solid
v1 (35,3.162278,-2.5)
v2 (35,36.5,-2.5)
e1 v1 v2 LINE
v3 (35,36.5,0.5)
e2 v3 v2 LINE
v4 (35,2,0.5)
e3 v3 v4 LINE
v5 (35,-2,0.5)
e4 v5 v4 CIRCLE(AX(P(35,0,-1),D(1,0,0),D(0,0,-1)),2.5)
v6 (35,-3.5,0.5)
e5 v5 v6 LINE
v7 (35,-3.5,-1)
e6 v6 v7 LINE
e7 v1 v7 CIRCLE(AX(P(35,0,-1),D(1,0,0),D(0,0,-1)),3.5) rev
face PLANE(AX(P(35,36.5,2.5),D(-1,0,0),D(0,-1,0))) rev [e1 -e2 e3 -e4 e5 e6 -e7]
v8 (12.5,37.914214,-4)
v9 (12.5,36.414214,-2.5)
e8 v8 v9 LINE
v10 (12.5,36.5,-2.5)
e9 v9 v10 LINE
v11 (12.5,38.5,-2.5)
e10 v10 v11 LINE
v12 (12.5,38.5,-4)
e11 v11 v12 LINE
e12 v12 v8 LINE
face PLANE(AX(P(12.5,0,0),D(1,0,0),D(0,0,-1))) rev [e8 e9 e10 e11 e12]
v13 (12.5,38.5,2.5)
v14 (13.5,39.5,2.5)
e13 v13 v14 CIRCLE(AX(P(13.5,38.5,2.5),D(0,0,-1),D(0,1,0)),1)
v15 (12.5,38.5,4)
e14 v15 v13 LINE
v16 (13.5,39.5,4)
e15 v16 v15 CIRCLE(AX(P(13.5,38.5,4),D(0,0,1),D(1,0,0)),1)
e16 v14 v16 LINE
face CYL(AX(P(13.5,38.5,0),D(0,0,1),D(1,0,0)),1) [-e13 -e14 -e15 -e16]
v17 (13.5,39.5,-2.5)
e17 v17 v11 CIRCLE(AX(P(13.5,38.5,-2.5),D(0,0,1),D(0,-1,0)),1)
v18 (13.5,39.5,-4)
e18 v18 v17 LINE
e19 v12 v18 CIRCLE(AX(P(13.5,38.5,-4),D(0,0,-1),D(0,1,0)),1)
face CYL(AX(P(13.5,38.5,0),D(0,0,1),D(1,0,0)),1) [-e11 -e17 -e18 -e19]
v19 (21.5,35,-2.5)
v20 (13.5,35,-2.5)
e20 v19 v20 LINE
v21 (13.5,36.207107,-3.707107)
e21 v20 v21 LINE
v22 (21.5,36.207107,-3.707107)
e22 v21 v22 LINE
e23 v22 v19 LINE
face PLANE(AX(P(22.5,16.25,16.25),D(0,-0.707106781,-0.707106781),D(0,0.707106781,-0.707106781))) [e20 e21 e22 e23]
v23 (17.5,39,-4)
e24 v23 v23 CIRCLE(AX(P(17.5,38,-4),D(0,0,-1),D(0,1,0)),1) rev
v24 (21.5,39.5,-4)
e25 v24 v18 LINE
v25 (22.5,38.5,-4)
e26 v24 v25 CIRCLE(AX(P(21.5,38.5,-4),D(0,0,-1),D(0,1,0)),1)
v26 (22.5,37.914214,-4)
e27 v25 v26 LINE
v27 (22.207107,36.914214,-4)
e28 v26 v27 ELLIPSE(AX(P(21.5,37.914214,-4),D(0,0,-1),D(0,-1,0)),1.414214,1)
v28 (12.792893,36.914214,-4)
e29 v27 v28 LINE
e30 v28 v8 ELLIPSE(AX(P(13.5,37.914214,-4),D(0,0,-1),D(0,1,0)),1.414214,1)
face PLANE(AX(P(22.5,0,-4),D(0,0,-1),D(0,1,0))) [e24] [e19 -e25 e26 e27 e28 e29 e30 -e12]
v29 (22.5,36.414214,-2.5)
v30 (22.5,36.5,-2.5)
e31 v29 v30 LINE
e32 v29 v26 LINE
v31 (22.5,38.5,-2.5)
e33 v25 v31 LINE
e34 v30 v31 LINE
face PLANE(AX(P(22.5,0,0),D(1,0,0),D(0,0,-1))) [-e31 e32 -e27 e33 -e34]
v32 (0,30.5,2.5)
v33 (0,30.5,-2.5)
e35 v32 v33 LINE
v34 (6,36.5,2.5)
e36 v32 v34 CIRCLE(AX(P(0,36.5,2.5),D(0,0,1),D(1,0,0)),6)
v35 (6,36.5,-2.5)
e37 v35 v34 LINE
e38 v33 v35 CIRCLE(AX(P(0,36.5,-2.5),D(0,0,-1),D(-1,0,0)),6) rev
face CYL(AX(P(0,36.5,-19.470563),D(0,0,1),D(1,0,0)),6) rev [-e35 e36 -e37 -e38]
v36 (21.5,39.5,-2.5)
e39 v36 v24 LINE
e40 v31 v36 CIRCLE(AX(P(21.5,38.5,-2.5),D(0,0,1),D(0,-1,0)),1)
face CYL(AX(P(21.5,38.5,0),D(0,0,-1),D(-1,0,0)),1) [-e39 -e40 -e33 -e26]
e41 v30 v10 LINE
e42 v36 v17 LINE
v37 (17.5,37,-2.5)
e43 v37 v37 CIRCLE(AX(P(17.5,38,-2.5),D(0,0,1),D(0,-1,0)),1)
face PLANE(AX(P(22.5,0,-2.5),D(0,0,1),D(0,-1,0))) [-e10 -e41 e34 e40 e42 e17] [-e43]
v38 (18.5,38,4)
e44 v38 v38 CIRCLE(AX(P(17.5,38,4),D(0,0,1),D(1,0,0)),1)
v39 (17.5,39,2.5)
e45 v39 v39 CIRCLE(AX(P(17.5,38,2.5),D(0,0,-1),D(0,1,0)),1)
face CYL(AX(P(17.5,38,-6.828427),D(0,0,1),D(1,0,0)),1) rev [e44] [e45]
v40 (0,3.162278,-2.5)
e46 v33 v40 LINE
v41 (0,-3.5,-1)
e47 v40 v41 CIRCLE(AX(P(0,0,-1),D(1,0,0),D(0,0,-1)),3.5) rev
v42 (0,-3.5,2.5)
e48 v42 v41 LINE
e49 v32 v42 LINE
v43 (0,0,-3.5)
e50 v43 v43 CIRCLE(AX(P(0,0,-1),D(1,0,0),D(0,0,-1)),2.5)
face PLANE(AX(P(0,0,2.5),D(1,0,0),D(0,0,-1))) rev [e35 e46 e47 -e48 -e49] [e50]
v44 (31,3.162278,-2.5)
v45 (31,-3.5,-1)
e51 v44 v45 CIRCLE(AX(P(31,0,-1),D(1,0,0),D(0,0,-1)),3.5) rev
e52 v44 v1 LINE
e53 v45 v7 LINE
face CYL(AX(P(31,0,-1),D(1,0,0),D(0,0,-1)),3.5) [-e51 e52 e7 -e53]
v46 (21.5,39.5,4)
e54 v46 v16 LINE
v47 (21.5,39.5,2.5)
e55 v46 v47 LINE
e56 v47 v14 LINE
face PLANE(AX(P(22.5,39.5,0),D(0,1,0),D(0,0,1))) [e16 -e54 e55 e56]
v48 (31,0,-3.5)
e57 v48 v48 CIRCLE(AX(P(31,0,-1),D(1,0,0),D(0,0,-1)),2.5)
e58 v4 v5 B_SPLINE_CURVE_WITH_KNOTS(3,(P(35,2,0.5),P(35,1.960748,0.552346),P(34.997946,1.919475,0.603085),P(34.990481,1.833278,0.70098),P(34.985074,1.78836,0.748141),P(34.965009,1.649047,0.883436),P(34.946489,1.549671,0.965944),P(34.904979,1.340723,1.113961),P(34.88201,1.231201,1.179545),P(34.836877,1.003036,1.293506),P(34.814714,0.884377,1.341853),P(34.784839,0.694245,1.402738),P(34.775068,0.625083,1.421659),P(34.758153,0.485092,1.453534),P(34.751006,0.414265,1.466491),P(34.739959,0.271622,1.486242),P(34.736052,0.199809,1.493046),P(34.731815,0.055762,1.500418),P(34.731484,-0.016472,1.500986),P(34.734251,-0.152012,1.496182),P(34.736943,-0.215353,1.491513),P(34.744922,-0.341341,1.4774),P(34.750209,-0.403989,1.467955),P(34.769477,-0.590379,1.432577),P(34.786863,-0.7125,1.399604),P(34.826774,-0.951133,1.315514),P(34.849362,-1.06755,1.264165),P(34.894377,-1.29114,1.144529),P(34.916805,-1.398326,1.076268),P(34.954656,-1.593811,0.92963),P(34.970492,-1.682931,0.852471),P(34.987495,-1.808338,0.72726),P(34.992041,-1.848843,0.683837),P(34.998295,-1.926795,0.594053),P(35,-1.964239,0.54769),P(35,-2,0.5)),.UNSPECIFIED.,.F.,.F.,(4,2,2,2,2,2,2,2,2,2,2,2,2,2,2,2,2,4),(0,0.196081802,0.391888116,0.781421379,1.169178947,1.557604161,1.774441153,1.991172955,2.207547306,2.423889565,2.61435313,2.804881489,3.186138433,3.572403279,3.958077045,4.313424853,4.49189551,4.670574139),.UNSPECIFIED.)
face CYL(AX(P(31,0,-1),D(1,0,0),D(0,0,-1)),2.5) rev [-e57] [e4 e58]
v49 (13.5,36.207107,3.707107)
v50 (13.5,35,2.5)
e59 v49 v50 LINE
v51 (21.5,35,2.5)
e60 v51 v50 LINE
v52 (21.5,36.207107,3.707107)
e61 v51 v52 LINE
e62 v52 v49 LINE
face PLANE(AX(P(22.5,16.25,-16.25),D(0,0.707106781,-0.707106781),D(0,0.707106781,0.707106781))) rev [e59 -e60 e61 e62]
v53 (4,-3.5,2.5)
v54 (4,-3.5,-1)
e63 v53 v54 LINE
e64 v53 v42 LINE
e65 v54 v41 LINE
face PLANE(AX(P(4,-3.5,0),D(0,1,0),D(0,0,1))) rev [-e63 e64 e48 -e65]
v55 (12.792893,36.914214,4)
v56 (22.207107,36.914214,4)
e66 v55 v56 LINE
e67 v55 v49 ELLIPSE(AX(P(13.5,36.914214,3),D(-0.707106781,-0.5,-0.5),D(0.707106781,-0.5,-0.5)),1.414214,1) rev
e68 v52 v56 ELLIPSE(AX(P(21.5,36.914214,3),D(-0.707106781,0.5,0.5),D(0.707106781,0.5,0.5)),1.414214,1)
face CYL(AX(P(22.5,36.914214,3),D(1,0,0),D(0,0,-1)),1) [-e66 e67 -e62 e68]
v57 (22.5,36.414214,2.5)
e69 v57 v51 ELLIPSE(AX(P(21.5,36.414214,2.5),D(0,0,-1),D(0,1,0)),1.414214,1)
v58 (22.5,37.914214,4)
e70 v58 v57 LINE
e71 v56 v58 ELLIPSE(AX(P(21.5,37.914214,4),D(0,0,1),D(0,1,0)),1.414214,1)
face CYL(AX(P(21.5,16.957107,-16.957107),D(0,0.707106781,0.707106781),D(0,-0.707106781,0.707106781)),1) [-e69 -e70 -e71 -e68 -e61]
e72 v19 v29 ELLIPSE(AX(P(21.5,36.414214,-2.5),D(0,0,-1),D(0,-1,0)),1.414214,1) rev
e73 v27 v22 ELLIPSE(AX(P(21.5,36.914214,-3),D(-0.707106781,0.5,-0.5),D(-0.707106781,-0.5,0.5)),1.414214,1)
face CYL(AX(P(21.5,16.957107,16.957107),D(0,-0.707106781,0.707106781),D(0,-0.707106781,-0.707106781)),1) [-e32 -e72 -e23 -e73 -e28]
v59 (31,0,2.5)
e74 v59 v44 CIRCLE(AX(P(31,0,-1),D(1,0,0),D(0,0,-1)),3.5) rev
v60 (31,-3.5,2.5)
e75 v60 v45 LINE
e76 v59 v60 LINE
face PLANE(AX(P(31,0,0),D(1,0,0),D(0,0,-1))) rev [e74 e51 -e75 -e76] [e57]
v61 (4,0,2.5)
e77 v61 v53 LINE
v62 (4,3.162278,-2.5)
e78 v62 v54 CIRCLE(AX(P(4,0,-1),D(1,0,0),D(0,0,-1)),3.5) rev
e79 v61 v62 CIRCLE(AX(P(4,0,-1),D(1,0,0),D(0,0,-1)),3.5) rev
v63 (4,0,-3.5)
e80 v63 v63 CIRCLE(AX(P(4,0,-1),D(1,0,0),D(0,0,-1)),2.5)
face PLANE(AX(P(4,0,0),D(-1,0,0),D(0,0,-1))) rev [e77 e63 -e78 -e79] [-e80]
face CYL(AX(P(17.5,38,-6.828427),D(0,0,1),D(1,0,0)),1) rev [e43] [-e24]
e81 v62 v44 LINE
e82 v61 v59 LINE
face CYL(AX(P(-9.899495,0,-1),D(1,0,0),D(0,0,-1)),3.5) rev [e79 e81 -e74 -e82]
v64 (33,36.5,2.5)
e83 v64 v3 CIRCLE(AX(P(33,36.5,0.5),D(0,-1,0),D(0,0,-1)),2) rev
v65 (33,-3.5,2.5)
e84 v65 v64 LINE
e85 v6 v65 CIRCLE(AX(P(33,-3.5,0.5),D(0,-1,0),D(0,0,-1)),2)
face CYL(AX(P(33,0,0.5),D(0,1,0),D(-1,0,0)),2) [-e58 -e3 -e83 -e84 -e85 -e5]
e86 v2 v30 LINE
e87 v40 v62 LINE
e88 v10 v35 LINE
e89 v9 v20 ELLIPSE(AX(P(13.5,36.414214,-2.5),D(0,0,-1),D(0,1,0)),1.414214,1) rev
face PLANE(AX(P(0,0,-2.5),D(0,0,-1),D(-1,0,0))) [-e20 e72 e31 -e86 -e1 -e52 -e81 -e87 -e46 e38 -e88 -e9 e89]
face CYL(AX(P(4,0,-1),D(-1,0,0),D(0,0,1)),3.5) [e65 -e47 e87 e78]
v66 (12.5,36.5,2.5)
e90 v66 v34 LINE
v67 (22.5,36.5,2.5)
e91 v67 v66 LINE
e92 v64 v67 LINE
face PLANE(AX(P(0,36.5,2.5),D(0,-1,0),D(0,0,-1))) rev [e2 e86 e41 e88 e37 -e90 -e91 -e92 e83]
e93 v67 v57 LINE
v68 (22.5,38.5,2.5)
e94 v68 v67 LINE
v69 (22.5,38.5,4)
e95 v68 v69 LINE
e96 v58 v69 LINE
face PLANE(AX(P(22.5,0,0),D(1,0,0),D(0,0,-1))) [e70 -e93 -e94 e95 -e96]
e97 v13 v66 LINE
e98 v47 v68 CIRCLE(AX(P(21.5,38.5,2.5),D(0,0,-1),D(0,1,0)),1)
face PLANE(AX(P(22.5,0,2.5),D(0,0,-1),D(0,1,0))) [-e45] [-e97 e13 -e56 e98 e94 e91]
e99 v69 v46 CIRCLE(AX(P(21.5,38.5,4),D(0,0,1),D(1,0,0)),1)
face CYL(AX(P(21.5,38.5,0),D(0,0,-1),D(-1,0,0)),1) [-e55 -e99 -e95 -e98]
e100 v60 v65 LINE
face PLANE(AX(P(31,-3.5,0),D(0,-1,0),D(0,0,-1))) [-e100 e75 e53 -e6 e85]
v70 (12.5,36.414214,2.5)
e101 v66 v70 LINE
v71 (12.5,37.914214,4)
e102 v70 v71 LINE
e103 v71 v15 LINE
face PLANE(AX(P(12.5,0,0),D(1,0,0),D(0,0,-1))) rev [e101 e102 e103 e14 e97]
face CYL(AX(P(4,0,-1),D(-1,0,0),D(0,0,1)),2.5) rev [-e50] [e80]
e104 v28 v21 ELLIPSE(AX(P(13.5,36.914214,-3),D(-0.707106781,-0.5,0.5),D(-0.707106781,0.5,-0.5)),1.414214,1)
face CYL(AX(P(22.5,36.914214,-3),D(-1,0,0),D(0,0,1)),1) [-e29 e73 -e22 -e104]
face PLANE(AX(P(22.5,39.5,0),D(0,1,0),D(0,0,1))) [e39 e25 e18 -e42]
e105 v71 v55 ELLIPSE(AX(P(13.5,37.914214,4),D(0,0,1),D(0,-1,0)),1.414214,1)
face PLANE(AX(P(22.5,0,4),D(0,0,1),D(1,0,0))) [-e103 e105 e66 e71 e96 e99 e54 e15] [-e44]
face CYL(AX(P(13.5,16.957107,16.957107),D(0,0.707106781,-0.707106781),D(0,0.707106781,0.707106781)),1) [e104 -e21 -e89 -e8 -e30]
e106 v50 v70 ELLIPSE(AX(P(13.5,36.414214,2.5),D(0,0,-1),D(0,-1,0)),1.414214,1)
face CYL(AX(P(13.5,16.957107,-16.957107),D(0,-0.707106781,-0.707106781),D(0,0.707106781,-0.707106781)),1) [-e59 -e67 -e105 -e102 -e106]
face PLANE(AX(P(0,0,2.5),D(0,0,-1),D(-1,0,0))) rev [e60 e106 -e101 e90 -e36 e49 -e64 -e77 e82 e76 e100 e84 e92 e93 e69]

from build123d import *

# Parameters (mm, degrees)
SKETCH1_W           = 35
SKETCH1_H           = 36.5
BOSS_EXTRUDE1_DEPTH = 2.5
SKETCH3_R           = 3.5
CUT_EXTRUDE1_DEPTH  = 35
SKETCH4_R           = 2.5
BOSS_EXTRUDE3_DEPTH = 4
SKETCH5_W           = 1.5
SKETCH5_H           = 3
BOSS_EXTRUDE4_DEPTH = 5
CUT_EXTRUDE2_REACH  = 55.456
SKETCH6_R           = 1
FILLET1_R           = 1
FILLET2_R           = 1
SKETCH7_R           = 6
CUT_EXTRUDE3_DEPTH  = 5
FILLET3_R           = 2


with BuildPart() as part:
    # Sketch1 → Boss-Extrude1 (new, symmetric)
    with BuildSketch(Plane.XY):
        with Locations((17.5, 18.25)):
            Rectangle(SKETCH1_W, SKETCH1_H)
    extrude(amount=BOSS_EXTRUDE1_DEPTH, both=True)

    # Sketch3 → Cut-Extrude1 (cut)
    with BuildSketch(Plane(origin=(35, 0, 0), x_dir=(0, 0, -1), z_dir=(1, 0, 0))):
        with Locations((1, 0)):
            Circle(SKETCH3_R)
    extrude(amount=-CUT_EXTRUDE1_DEPTH, mode=Mode.SUBTRACT)

    # Sketch4 → Boss-Extrude3 (add)
    # profile 1 of 2: a face of its own
    with BuildSketch(Plane(origin=(35, 0, 0), x_dir=(0, 0, -1), z_dir=(1, 0, 0))):
        with BuildLine():
            ThreePointArc((2.5, 3.16227766), (-0.870828693, 2.958039892), (-2.5, 0))
            ThreePointArc((-2.5, 0), (-1.474873734, -2.474873734), (1, -3.5))
            ThreePointArc((1, -3.5), (3.474873734, -2.474873734), (4.5, 0))
            ThreePointArc((4.5, 0), (3.958039892, 1.870828693), (2.5, 3.16227766))
        make_face()
        with Locations((1, 0)):
            Circle(SKETCH4_R, mode=Mode.SUBTRACT)
    # profile 2 of 2: a face of its own
    with BuildSketch(Plane(origin=(35, 0, 0), x_dir=(0, 0, -1), z_dir=(1, 0, 0))):
        with BuildLine():
            ThreePointArc((1, -3.5), (-1.474873734, -2.474873734), (-2.5, 0))
            Line((-2.5, 0), (-2.5, -3.5))
            Line((-2.5, -3.5), (1, -3.5))
        make_face()
    boss_extrude3 = extrude(amount=-BOSS_EXTRUDE3_DEPTH)

    # Mirror2: Boss-Extrude3 across plane
    add(boss_extrude3.mirror(Plane(origin=(17.5, 0, 0), x_dir=(0, 0, 1), z_dir=(1, 0, 0))))

    # Sketch5 → Boss-Extrude4 (add, symmetric)
    with BuildSketch(Plane(origin=(17.5, 0, 0), x_dir=(0, 0, -1), z_dir=(1, 0, 0))):
        with Locations((-3.25, 38)):
            Rectangle(SKETCH5_W, SKETCH5_H)
        Polygon((-4, 36.5), (-2.5, 35), (-2.5, 36.5), align=None)
        Polygon((2.5, 35), (2.5, 36.5), (4, 36.5), align=None)
        with Locations((3.25, 38)):
            Rectangle(SKETCH5_W, SKETCH5_H)
    extrude(amount=BOSS_EXTRUDE4_DEPTH, both=True)

    # Cut-Extrude2: up to this face of the body (flat: up to its plane)
    cut_extrude2_end = Plane(part.part.faces().sort_by_distance((17.5, 38, -4))[0])
    # Sketch6 → Cut-Extrude2 (cut, up to the picked face)
    with BuildSketch(Plane.XY.offset(4), mode=Mode.PRIVATE) as cut_extrude2_sk1:
        with Locations(Location((17.5, 38, 0), (0, 0, 270))):
            Circle(SKETCH6_R)
    cut_extrude2_tool1 = split(extrude(cut_extrude2_sk1.sketch, amount=-CUT_EXTRUDE2_REACH, mode=Mode.PRIVATE), bisect_by=cut_extrude2_end, keep=Keep.BOTH, mode=Mode.PRIVATE)
    add(cut_extrude2_tool1.solids().sort_by(Axis((17.5, 38, 4), (0, 0, -1)))[0], mode=Mode.SUBTRACT)

    # Fillet1
    fillet1_edges = [part.edges().sort_by_distance(p)[0] for p in [
        (12.5, 35.75, 3.25),
        (17.5, 36.5, 4),
        (22.5, 35.75, 3.25),
        (22.5, 35.75, -3.25),
        (17.5, 36.5, -4),
        (12.5, 35.75, -3.25),
    ]]
    fillet(fillet1_edges, radius=FILLET1_R)

    # Fillet2
    fillet2_edges = [part.edges().sort_by_distance(p)[0] for p in [
        (22.5, 39.5, 3.25),
        (12.5, 39.5, 3.25),
        (22.5, 39.5, -3.25),
        (12.5, 39.5, -3.25),
    ]]
    fillet(fillet2_edges, radius=FILLET2_R)

    # Sketch7 → Cut-Extrude3 (cut)
    with BuildSketch(Plane.XY.offset(2.5)):
        with Locations((0, 36.5)):
            Circle(SKETCH7_R)
    extrude(amount=-CUT_EXTRUDE3_DEPTH, mode=Mode.SUBTRACT)

    # Fillet3
    # the kernel refuses this fillet: 2 mm, written as the material it takes off along each edge
    with BuildSketch(Plane(origin=(35, -8.5, 2.5), x_dir=(-1, 0, 0), z_dir=(0, 1, 0))) as fillet3_piece_1:
        with BuildLine():
            CenterArc((FILLET3_R, -FILLET3_R), FILLET3_R, 90, 90)
            Line((0, -FILLET3_R), (0, 0))
            Line((0, 0), (FILLET3_R, 0))
        make_face()
    extrude(amount=50, mode=Mode.SUBTRACT)


solid = part.part
